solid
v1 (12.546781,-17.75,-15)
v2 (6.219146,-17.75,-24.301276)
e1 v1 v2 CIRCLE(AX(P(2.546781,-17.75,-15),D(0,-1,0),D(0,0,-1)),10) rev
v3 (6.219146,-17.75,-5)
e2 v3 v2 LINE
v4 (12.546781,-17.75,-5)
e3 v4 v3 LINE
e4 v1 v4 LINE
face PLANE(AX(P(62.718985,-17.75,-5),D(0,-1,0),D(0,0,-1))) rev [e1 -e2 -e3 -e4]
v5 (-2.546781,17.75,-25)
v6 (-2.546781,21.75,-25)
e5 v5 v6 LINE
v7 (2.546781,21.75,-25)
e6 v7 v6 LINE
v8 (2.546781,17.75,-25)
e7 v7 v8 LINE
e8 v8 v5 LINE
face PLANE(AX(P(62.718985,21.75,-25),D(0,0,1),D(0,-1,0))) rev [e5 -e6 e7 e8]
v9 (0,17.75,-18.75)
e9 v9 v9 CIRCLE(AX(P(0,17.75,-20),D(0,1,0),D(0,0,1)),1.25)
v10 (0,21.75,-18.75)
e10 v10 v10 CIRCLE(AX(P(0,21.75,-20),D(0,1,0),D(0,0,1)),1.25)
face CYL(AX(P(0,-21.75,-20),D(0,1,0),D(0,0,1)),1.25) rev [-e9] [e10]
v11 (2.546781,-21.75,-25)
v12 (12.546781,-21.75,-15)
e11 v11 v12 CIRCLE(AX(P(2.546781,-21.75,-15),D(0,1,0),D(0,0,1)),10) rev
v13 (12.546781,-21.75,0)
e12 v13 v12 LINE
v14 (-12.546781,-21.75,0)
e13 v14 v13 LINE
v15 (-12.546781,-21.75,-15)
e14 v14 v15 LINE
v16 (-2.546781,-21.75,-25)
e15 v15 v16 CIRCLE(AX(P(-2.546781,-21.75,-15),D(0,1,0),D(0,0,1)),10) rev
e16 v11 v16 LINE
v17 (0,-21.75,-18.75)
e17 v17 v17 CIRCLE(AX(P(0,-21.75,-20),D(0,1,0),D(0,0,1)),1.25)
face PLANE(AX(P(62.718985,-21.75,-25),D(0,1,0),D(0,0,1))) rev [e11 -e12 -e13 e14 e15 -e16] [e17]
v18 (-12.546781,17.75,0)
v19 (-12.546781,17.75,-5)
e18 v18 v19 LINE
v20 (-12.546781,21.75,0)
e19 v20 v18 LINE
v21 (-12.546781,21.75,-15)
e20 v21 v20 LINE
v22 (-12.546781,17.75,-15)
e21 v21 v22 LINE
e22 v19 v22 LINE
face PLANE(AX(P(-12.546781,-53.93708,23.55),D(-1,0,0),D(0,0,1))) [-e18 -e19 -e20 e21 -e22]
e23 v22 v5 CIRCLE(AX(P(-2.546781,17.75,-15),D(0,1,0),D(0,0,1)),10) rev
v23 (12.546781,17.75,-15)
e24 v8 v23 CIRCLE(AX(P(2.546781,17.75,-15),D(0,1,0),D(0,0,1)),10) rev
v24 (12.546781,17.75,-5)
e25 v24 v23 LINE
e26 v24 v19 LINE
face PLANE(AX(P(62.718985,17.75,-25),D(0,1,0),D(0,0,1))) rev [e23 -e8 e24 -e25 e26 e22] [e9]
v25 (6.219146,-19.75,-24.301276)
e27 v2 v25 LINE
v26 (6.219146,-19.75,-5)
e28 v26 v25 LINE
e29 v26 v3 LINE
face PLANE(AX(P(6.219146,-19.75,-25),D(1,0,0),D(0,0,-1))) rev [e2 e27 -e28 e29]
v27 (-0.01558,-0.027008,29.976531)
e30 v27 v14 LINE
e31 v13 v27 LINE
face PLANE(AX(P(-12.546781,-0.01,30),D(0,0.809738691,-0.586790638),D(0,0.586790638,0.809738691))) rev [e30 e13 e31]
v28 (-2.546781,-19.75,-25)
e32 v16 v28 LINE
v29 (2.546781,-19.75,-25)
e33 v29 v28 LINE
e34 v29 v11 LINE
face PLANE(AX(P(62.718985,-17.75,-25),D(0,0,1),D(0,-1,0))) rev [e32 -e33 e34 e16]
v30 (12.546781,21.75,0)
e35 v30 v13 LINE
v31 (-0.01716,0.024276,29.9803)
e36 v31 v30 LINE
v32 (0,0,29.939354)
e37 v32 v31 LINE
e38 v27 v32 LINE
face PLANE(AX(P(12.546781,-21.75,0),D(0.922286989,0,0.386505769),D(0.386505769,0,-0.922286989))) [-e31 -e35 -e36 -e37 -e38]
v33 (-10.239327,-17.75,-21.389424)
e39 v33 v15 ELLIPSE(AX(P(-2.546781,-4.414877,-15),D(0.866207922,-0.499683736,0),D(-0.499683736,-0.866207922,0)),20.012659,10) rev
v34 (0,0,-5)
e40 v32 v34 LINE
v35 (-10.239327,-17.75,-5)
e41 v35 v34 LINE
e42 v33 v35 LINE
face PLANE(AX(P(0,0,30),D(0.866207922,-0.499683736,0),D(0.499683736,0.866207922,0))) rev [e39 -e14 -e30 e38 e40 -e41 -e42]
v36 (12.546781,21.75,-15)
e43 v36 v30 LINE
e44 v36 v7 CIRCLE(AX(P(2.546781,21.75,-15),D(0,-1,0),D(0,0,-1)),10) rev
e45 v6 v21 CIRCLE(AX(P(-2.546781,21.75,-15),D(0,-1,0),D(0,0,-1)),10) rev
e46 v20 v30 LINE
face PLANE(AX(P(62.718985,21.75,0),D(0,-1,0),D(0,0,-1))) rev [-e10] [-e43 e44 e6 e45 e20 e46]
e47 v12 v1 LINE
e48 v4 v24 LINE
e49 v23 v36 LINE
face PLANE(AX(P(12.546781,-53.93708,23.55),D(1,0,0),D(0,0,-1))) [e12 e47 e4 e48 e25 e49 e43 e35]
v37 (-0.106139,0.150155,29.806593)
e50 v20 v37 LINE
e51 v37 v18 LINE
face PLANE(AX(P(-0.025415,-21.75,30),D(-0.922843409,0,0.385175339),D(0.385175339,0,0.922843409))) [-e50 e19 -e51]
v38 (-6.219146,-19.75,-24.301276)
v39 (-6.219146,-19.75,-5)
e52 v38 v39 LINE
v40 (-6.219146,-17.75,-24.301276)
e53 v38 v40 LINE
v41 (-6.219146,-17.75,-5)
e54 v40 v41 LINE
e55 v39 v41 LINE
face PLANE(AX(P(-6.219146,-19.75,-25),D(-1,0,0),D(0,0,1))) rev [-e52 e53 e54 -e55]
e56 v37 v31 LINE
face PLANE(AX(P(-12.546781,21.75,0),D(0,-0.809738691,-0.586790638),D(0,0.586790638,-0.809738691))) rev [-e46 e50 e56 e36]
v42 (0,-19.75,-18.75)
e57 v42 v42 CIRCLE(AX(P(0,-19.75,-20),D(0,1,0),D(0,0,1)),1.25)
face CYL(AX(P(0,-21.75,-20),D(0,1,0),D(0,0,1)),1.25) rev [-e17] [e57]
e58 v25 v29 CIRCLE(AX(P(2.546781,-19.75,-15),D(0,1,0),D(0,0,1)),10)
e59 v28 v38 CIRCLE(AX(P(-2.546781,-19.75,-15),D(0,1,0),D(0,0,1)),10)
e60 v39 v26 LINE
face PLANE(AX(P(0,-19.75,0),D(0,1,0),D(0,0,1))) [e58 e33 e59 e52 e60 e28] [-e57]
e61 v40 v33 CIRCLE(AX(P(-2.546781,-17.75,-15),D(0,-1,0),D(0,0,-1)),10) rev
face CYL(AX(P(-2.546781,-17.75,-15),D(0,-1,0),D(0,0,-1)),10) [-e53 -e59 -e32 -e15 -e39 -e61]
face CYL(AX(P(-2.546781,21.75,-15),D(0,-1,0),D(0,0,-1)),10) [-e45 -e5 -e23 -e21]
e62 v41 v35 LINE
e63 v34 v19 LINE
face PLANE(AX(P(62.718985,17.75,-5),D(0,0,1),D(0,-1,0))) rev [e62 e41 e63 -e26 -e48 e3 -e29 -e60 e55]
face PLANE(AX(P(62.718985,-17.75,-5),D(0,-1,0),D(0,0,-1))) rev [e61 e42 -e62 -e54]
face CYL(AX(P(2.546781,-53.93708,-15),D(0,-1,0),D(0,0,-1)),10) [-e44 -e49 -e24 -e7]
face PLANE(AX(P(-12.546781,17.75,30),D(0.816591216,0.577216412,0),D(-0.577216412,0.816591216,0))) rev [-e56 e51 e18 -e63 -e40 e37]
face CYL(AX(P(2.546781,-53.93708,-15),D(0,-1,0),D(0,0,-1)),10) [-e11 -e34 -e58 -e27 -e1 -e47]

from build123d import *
from OCP.BRepFilletAPI import BRepFilletAPI_MakeChamfer

# Parameters (mm, degrees)
SKETCH4_W                = 12.46
SKETCH4_H                = 17.25
BOSS_EXTRUDE3_DEPTH      = 6
BOSS_EXTRUDE6_DEPTH      = 7.3
BOSS_EXTRUDE6_DEPTH_BACK = 17.25
SKETCH8_R                = 12.546781182
SKETCH8_R_2              = 11.15
BOSS_EXTRUDE4_DEPTH      = 17.25
SKETCH6_R                = 2
CUT_EXTRUDE1_DEPTH       = 5
CHAMFER1_SIZE            = 0.5
CHAMFER1_SIZE_2          = 0.866025404
SKETCH10_W               = 12.46
SKETCH10_H               = 23.7
CUT_EXTRUDE3_DEPTH       = 17.25
CUT_EXTRUDE4_REACH       = 43.938
SKETCH11_W               = 5
SKETCH11_H               = 3
BOSS_EXTRUDE7_START      = -7.3
BOSS_EXTRUDE7_DEPTH      = 7.3
BOSS_EXTRUDE9_START      = 10
BOSS_EXTRUDE9_DEPTH      = 10
BOSS_EXTRUDE10_DEPTH     = 25.093562364
SKETCH18_W               = 20
SKETCH18_H               = 12.438292938
CUT_EXTRUDE5_DEPTH       = 2
CUT_EXTRUDE6_DEPTH       = 57.41497434
CUT_EXTRUDE6_DEPTH_BACK  = 57.41497434
SKETCH19_R               = 1.25
FILLET1_R                = 10
CUT_EXTRUDE7_DEPTH       = 55.620050849
CUT_EXTRUDE7_DEPTH_BACK  = 55.620050849
SKETCH20_W               = 25.093562364
SKETCH20_H               = 36.096781182
BOSS_EXTRUDE11_DEPTH     = 43.5
CUT_EXTRUDE8_DEPTH       = 40.12140358
CUT_EXTRUDE8_DEPTH_BACK  = 40.12140358
CUT_EXTRUDE9_DEPTH       = 40.12140358
CUT_EXTRUDE9_DEPTH_BACK  = 40.12140358


with BuildPart() as part:
    # Sketch4 → Boss-Extrude3 (new body)
    with BuildSketch(Plane.XY):
        with Locations((0, -1.35)):
            Rectangle(SKETCH4_W, SKETCH4_H)
    extrude(amount=BOSS_EXTRUDE3_DEPTH)



with BuildPart() as body_2:
    # Sketch8 → Boss-Extrude6 (new, two sides: drawn at the far end of the back side and taken through both)
    with BuildSketch(Plane(origin=(0, -9.975, 0), x_dir=(-1, 0, 0), z_dir=(0, -1, 0)).offset(-BOSS_EXTRUDE6_DEPTH_BACK)):
        with Locations(Location((0, -23.55, 0), (0, 0, 90))):
            Circle(SKETCH8_R)
        with Locations(Location((0, -23.55, 0), (0, 0, 90))):
            Circle(SKETCH8_R_2, mode=Mode.SUBTRACT)
    extrude(amount=BOSS_EXTRUDE6_DEPTH + BOSS_EXTRUDE6_DEPTH_BACK)


with BuildPart() as part_1:
    add(part.part)

    add(body_2.part)  # Boss-Extrude4 merges body 2
    # Sketch5 → Boss-Extrude4 (add)
    with BuildSketch(Plane(origin=(0, 7.275, 0), x_dir=(1, 0, 0), z_dir=(0, 1, 0))):
        with BuildLine():
            Line((12.546781182, -23.55), (12.546781182, 0))
            Line((12.546781182, 0), (6.23, 0))
            Line((6.23, 0), (6.23, -29.7))
            Line((6.23, -29.7), (-6.23, -29.7))
            Line((-6.23, -29.7), (-6.23, 0))
            Line((-6.23, 0), (-12.546781182, 0))
            Line((-12.546781182, 0), (-12.546781182, -23.55))
            ThreePointArc((-12.546781182, -23.55), (0, -36.096781182), (12.546781182, -23.55))
        make_face()
    extrude(amount=-BOSS_EXTRUDE4_DEPTH)

    # Sketch6 → Cut-Extrude1 (cut)
    with BuildSketch(Plane(origin=(0, 7.275, 0), x_dir=(1, 0, 0), z_dir=(0, 1, 0))):
        with Locations(Location((0, -3.5, 0), (0, 0, 270))):
            Circle(SKETCH6_R)
        with Locations(Location((0, -32.2, 0), (0, 0, 270))):
            Circle(SKETCH6_R)
    extrude(amount=-CUT_EXTRUDE1_DEPTH, mode=Mode.SUBTRACT)

    # Chamfer1
    chamfer1_edges_1 = [part_1.edges().sort_by_distance(p)[0] for p in [
        (0, 7.275, 1.5),
    ]]
    chamfer1_side_1 = [part_1.faces().sort_by_distance(p)[0] for p in [
        (0, 7.275, 1.49),
    ]]
    chamfer1_edges_2 = [part_1.edges().sort_by_distance(p)[0] for p in [
        (0, 7.275, 30.2),
    ]]
    chamfer1_side_2 = [part_1.faces().sort_by_distance(p)[0] for p in [
        (0, 7.275, 30.19),
    ]]
    chamfer1 = BRepFilletAPI_MakeChamfer(part_1.part.solid().wrapped)
    for e in chamfer1_edges_1:
        chamfer1.Add(CHAMFER1_SIZE - 0.0001, CHAMFER1_SIZE_2 - 0.0001, e.wrapped, chamfer1_side_1[0].wrapped)
    for e in chamfer1_edges_2:
        chamfer1.Add(CHAMFER1_SIZE - 0.0001, CHAMFER1_SIZE_2 - 0.0001, e.wrapped, chamfer1_side_2[0].wrapped)
    add(Compound.cast(chamfer1.Shape()), mode=Mode.REPLACE)  # a hair under: the kernel refuses the full size

    # Sketch10 → Cut-Extrude3 (cut)
    with BuildSketch(Plane(origin=(0, 7.275, 0), x_dir=(1, 0, 0), z_dir=(0, 1, 0))):
        with Locations((0, -17.85)):
            Rectangle(SKETCH10_W, SKETCH10_H)
    extrude(amount=-CUT_EXTRUDE3_DEPTH, mode=Mode.SUBTRACT)

    # Sketch11 → Cut-Extrude4 (cut, up to next)
    with BuildSketch(Plane.XY.offset(36.096781182), mode=Mode.PRIVATE) as cut_extrude4_sk1:
        with Locations((0, -8.475)):
            Rectangle(SKETCH11_W, SKETCH11_H)
    cut_extrude4_tool1 = extrude(cut_extrude4_sk1.sketch, amount=-CUT_EXTRUDE4_REACH, mode=Mode.PRIVATE) & part_1.part
    add(cut_extrude4_tool1.solids().sort_by_distance((0, -8.475, 36.096781))[0], mode=Mode.SUBTRACT)

    # Sketch13 → Boss-Extrude7 (add)
    with BuildSketch(Plane.XZ.offset(17.275).offset(BOSS_EXTRUDE7_START)):
        with BuildLine():
            Line((-12.546781182, 23.55), (-12.546781182, 0))
            Line((-12.546781182, 0), (12.546781182, 0))
            Line((12.546781182, 0), (12.546781182, 23.55))
            ThreePointArc((12.546781182, 23.55), (0, 11.003218818), (-12.546781182, 23.55))
        make_face()
    extrude(amount=BOSS_EXTRUDE7_DEPTH)

    # Sketch15 → Boss-Extrude9 (add)
    with BuildSketch(Plane(origin=(0, 7.275, 0), x_dir=(1, 0, 0), z_dir=(0, 1, 0)).offset(BOSS_EXTRUDE9_START)):
        with BuildLine():
            Line((-12.546781182, 0), (12.546781182, 0))
            Line((12.546781182, 0), (12.546781182, -23.55))
            ThreePointArc((12.546781182, -23.55), (0, -36.096781182), (-12.546781182, -23.55))
            Line((-12.546781182, -23.55), (-12.546781182, 0))
        make_face()
        with BuildLine():
            Line((-6.23, -0.8), (6.23, -0.8))
            Line((6.23, -0.8), (6.23, -33.5))
            ThreePointArc((6.23, -33.5), (5.937106781, -34.207106781), (5.23, -34.5))
            Line((5.23, -34.5), (-5.23, -34.5))
            ThreePointArc((-5.23, -34.5), (-5.937106781, -34.207106781), (-6.23, -33.5))
            Line((-6.23, -33.5), (-6.23, -0.8))
        make_face(mode=Mode.SUBTRACT)
    extrude(amount=-BOSS_EXTRUDE9_DEPTH)

    # Sketch17 → Boss-Extrude10 (add)
    with BuildSketch(Plane(origin=(-12.546781182, 4.728218818, 0), x_dir=(0, -1, 0), z_dir=(1, 0, 0))):
        Polygon((26.478218818, 25), (26.478218818, 0), (-17.021781182, 0), (-17.021781182, 25), (-13.021781182, 25), (-13.021781182, 5), (22.478218818, 5), (22.478218818, 25), align=None)
    extrude(amount=BOSS_EXTRUDE10_DEPTH)

    # Sketch18 → Cut-Extrude5 (cut)
    with BuildSketch(Plane.ZX.offset(-17.75)):
        with Locations((-15, 0)):
            Rectangle(SKETCH18_W, SKETCH18_H)
    extrude(amount=-CUT_EXTRUDE5_DEPTH, mode=Mode.SUBTRACT)

    # Sketch19 → Cut-Extrude6 (cut, two sides: drawn at the far end of the back side and taken through both)
    with BuildSketch(Plane.ZX.offset(-19.75).offset(-CUT_EXTRUDE6_DEPTH_BACK)):
        with Locations((-20, 0)):
            Circle(SKETCH19_R)
    extrude(amount=CUT_EXTRUDE6_DEPTH + CUT_EXTRUDE6_DEPTH_BACK, mode=Mode.SUBTRACT)

    # Fillet1
    fillet1_edges = [part_1.edges().sort_by_distance(p)[0] for p in [
        (12.546781182, -19.75, -25),
        (-12.546781182, -19.75, -25),
        (-12.546781182, 19.75, -25),
        (12.546781182, 19.75, -25),
    ]]
    fillet(fillet1_edges, radius=FILLET1_R)

    # Sketch20 → Cut-Extrude7 (cut, two sides: drawn at the far end of the back side and taken through both)
    with BuildSketch(Plane(origin=(0, 17.275, 0), x_dir=(1, 0, 0), z_dir=(0, 1, 0)).offset(-CUT_EXTRUDE7_DEPTH_BACK)):
        with Locations((0, -18.048390591)):
            Rectangle(SKETCH20_W, SKETCH20_H)
    extrude(amount=CUT_EXTRUDE7_DEPTH + CUT_EXTRUDE7_DEPTH_BACK, mode=Mode.SUBTRACT)

    # Sketch21 → Boss-Extrude11 (add)
    with BuildSketch(Plane(origin=(0, 21.75, 0), x_dir=(1, 0, 0), z_dir=(0, 1, 0))):
        Polygon((12.546781182, 0), (-0.025415104, -30), (-12.546781182, 0), align=None)
    extrude(amount=-BOSS_EXTRUDE11_DEPTH)

    # Sketch22 → Cut-Extrude8 (cut, two sides: drawn at the far end of the back side and taken through both)
    with BuildSketch(Plane(origin=(0, 0, 0), x_dir=(0, 0, -1), z_dir=(1, 0, 0)).offset(-CUT_EXTRUDE8_DEPTH_BACK)):
        Polygon((0, 21.75), (-30, 0.01), (-30, 21.75), align=None)
        Polygon((0, -21.75), (-30, -21.75), (-30, -0.01), align=None)
    extrude(amount=CUT_EXTRUDE8_DEPTH + CUT_EXTRUDE8_DEPTH_BACK, mode=Mode.SUBTRACT)

    # Sketch23 → Cut-Extrude9 (cut, two sides: drawn at the far end of the back side and taken through both)
    with BuildSketch(Plane(origin=(0, 0, 0), x_dir=(-1, 0, 0), z_dir=(0, 0, -1)).offset(-CUT_EXTRUDE9_DEPTH_BACK)):
        Polygon((12.546781182, 17.75), (0, 0), (12.546781182, -21.75), align=None)
    extrude(amount=CUT_EXTRUDE9_DEPTH + CUT_EXTRUDE9_DEPTH_BACK, mode=Mode.SUBTRACT)


solid = part_1.part
